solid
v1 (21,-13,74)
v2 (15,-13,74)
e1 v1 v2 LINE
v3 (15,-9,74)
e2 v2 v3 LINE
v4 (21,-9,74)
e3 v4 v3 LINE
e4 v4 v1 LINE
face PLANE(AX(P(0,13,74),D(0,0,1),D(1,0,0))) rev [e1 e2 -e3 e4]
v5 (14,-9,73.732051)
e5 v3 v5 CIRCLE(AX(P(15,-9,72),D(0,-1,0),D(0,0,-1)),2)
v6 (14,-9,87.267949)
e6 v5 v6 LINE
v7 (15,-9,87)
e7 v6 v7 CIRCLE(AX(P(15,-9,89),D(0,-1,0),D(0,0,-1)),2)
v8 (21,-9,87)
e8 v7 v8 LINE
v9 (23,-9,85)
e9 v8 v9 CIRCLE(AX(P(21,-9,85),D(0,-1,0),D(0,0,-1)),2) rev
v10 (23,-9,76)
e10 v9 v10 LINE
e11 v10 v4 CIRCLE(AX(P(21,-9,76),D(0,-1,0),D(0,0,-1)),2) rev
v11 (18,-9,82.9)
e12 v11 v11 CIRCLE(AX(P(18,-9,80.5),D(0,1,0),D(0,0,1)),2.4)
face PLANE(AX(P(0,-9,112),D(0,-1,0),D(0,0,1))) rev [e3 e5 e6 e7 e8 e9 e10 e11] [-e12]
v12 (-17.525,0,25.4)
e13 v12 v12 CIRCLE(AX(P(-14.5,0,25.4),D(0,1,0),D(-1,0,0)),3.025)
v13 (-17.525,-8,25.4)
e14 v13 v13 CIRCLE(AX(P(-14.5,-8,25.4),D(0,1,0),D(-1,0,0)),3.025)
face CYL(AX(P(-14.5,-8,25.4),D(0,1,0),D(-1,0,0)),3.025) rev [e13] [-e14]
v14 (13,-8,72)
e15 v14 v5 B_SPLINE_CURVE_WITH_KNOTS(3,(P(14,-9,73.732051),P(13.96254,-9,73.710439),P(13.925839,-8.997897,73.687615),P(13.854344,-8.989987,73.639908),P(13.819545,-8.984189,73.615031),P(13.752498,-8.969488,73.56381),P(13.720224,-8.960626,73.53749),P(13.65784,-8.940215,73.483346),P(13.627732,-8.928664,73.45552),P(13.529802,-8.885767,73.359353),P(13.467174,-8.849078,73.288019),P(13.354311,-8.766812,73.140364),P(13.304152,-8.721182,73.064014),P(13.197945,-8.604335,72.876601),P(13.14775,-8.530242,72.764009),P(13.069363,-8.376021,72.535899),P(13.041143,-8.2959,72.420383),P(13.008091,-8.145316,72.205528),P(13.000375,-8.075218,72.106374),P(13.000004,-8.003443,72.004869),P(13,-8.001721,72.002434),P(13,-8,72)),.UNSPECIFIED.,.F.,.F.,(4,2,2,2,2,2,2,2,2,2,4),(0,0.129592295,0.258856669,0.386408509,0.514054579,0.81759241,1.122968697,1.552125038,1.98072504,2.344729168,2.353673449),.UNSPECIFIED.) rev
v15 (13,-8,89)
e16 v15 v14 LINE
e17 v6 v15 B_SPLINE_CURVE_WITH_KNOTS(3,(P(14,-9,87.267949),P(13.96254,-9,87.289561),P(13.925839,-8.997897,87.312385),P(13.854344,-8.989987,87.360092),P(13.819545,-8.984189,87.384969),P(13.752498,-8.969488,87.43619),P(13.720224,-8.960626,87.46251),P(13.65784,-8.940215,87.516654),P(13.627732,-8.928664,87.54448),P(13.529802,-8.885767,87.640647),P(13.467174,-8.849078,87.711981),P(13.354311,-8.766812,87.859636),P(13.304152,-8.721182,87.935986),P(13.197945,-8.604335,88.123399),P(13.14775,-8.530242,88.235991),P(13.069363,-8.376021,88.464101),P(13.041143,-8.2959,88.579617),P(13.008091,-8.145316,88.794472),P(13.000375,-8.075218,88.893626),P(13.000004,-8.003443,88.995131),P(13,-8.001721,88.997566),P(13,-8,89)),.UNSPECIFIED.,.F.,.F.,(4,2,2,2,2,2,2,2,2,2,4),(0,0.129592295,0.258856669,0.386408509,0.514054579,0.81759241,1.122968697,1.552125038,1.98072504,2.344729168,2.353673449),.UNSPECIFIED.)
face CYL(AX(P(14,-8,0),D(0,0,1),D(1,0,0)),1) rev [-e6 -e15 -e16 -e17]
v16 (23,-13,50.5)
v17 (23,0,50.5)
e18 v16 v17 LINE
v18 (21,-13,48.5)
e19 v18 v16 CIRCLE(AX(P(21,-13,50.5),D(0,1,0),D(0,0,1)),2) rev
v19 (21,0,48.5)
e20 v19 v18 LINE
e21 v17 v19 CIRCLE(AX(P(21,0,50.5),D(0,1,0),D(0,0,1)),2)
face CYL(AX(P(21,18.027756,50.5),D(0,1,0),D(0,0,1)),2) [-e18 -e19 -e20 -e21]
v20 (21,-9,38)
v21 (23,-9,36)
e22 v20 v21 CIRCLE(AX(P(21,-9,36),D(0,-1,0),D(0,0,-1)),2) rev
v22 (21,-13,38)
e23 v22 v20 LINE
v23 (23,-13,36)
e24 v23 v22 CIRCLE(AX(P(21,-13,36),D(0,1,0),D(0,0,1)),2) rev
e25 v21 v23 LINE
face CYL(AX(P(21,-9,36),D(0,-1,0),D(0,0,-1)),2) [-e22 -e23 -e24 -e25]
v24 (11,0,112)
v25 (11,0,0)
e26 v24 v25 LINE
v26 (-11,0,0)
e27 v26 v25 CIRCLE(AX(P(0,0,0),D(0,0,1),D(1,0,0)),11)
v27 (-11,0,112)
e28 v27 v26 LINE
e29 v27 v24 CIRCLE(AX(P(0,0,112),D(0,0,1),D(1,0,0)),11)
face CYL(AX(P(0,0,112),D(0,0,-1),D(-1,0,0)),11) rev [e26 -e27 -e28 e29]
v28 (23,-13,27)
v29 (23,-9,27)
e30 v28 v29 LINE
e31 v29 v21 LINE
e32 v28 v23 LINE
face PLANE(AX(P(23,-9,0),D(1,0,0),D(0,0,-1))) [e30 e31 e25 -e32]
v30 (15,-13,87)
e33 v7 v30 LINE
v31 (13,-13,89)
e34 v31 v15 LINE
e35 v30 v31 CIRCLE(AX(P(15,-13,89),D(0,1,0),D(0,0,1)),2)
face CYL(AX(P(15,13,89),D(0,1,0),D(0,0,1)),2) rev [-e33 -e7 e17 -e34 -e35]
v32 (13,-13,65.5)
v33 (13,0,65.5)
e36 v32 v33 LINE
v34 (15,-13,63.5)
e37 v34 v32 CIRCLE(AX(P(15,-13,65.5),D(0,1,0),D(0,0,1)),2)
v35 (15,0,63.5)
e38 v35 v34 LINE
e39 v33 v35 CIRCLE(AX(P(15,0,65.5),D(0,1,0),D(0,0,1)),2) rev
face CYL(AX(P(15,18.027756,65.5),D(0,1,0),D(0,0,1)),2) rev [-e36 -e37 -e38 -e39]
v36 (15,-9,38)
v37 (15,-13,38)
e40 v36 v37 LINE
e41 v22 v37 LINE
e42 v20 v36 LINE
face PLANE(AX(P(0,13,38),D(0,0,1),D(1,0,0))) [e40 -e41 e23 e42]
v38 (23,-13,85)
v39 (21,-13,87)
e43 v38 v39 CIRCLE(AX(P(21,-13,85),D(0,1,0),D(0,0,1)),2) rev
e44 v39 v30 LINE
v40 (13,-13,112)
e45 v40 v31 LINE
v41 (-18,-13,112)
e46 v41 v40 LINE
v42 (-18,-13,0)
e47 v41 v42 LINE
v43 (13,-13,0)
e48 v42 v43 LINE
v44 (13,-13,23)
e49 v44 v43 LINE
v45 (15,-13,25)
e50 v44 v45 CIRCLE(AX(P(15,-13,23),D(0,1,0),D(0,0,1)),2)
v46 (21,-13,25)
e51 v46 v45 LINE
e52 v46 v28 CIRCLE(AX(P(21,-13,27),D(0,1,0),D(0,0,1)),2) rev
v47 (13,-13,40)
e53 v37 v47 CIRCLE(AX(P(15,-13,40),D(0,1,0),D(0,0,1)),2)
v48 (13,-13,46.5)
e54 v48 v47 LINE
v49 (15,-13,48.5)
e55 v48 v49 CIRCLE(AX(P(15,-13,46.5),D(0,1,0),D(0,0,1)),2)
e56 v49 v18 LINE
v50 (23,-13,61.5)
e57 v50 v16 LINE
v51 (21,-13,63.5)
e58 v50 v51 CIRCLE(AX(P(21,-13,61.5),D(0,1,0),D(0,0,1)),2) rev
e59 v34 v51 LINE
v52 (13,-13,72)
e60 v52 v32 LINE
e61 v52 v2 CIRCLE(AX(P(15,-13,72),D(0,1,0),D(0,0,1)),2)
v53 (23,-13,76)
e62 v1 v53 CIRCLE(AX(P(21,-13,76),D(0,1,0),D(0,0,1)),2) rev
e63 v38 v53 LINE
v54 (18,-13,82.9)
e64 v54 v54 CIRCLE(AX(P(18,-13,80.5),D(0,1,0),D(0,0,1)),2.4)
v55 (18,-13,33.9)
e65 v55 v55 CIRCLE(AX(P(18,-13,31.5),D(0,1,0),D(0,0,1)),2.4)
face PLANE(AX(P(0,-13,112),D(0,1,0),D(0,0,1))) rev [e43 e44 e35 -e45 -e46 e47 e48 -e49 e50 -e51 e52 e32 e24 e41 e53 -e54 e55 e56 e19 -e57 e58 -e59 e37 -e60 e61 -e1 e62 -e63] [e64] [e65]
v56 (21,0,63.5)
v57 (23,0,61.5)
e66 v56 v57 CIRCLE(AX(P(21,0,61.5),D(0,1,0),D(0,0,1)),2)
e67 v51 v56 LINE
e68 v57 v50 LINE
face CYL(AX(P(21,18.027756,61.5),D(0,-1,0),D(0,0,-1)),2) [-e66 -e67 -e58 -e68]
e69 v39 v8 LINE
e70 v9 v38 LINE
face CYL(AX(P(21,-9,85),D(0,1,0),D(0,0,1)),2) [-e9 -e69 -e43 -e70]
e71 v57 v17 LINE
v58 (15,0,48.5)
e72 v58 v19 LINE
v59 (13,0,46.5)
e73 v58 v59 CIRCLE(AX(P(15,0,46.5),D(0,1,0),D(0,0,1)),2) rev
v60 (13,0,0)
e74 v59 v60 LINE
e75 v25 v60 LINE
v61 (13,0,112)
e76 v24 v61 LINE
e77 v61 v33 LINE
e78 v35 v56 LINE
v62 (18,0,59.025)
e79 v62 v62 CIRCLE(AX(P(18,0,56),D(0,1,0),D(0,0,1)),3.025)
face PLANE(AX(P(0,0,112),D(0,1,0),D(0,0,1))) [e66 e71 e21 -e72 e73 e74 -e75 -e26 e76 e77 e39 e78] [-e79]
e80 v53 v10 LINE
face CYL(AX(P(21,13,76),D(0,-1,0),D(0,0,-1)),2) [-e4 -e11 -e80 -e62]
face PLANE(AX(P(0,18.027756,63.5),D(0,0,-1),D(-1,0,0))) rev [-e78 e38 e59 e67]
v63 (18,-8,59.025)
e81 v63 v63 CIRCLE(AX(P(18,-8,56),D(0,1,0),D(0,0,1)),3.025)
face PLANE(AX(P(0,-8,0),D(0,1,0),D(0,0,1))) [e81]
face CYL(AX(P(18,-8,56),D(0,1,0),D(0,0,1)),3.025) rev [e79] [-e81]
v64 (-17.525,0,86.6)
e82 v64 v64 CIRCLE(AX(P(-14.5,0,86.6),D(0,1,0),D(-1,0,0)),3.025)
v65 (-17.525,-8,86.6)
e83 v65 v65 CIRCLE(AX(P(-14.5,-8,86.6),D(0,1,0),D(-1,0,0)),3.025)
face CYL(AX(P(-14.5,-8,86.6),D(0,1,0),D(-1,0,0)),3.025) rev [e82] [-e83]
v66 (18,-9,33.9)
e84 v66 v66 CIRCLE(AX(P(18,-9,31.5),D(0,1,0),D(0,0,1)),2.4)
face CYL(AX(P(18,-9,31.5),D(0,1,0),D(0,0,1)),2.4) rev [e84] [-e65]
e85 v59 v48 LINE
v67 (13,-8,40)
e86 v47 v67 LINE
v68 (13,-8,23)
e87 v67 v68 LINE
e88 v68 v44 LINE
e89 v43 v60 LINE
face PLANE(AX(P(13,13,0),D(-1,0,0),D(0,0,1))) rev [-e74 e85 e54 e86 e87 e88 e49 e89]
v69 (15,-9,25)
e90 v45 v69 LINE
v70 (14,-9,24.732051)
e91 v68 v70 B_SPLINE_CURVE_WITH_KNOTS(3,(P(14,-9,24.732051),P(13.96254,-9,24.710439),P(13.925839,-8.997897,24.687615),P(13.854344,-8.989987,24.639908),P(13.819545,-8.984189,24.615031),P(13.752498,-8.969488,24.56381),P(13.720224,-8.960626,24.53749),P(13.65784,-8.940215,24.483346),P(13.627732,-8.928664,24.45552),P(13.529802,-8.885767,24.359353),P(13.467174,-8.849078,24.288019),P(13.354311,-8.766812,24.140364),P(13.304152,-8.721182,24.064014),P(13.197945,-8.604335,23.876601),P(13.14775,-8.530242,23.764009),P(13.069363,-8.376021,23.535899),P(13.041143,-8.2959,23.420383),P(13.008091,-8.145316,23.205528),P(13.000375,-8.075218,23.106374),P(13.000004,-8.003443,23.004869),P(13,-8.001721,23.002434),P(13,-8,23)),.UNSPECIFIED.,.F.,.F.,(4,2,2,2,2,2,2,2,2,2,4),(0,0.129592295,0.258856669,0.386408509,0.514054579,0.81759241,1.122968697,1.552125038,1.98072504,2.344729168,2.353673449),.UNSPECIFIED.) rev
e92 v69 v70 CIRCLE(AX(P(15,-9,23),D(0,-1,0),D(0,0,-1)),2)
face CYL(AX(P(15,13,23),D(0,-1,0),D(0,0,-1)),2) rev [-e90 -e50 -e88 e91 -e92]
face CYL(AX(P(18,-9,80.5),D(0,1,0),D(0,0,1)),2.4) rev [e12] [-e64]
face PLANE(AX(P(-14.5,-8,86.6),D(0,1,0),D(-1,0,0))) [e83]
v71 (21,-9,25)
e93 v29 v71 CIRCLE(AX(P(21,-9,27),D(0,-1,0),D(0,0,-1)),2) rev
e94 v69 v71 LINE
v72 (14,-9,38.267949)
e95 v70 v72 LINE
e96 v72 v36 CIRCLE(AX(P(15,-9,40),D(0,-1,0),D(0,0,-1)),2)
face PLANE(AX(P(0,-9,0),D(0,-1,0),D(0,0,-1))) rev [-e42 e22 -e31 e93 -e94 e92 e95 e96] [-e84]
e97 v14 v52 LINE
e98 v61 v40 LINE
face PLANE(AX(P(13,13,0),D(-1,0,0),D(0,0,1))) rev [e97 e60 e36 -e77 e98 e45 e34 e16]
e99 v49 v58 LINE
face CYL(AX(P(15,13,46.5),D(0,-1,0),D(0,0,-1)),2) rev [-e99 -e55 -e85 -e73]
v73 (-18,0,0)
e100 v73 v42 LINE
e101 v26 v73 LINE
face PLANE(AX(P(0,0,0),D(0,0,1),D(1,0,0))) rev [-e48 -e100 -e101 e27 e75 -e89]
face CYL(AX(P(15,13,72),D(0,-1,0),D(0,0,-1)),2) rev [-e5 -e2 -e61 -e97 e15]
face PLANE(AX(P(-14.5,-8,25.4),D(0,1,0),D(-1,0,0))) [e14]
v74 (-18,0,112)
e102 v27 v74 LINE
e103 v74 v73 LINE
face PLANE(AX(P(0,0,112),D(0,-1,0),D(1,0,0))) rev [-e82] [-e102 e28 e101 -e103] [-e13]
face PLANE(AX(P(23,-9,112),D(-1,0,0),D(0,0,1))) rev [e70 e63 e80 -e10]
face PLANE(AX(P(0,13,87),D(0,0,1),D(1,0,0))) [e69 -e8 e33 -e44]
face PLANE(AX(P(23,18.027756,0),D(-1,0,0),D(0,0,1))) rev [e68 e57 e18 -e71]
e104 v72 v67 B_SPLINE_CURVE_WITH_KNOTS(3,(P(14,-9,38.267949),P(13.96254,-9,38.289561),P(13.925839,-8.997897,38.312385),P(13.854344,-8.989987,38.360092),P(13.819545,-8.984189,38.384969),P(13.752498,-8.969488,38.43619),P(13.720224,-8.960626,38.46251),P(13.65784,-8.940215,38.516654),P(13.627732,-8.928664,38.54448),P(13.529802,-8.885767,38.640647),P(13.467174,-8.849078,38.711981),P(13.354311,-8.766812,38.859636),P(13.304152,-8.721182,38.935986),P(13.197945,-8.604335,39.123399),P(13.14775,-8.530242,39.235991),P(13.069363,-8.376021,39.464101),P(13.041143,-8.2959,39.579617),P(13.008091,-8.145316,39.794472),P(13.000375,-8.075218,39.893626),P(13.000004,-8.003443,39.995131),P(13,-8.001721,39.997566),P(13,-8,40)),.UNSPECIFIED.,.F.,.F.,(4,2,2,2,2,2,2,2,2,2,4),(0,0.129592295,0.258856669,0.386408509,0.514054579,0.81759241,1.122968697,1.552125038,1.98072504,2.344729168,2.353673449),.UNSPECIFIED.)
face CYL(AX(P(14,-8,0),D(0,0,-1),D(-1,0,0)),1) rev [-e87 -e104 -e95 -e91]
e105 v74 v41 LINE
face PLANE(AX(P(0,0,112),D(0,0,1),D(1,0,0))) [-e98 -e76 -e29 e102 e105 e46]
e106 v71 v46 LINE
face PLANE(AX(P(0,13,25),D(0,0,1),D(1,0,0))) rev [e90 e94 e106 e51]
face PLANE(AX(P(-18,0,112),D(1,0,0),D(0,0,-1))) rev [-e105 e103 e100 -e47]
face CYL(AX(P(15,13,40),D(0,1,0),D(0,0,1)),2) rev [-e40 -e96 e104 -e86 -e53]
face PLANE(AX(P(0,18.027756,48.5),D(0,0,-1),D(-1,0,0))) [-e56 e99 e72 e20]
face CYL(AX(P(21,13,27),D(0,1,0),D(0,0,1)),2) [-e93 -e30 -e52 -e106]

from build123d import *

# Parameters (mm, degrees)
BOSS_EXTRUDE1_DEPTH  = 112
SKETCH2_R            = 3.025
CUT_EXTRUDE1_DEPTH   = 8
SKETCH3_W            = 11
SKETCH3_H            = 11
BOSS_EXTRUDE2_DEPTH  = 4
BOSS_EXTRUDE3_REACH  = 126.988
SKETCH8_W            = 10
SKETCH8_H            = 13
BOSS_EXTRUDE4_DEPTH  = 4
FILLET1_R            = 2
M4_CLEARANCE_HOLE1_D = 4.8
MIRROR1_START        = 12.831076745
MIRROR1_OUTLINE_W    = 4
MIRROR1_OUTLINE_H    = 13
MIRROR1_DEPTH        = 2.768923155
MIRROR1_START_2      = 20.4000001
MIRROR1_2_OUTLINE_W  = 4
MIRROR1_2_OUTLINE_H  = 13
MIRROR1_2_DEPTH      = 0.5999999
MIRROR1_START_3      = 74
MIRROR1_3_DEPTH      = 13
MIRROR1_4_OUTLINE_W  = 4.8000002
MIRROR1_4_OUTLINE_H  = 4
MIRROR1_4_DEPTH      = 4.0999999
MIRROR1_START_4      = 82.9000001
MIRROR1_5_OUTLINE_W  = 4.8000002
MIRROR1_5_OUTLINE_H  = 4
MIRROR1_5_DEPTH      = 4.0999999
MIRROR1_START_5      = 76
MIRROR1_6_OUTLINE_W  = 2
MIRROR1_6_OUTLINE_H  = 4
MIRROR1_6_DEPTH      = 9
MIRROR1_START_6      = -13
MIRROR1_7_DEPTH      = 4
CUT_EXTRUDE2_DEPTH   = 126.455171276
BOSS_EXTRUDE5_START  = -87
BOSS_EXTRUDE5_DEPTH  = 112
SKETCH15_W           = 10
SKETCH15_H           = 15
SKETCH15_R           = 3.025
BOSS_EXTRUDE6_DEPTH  = 13
SKETCH16_R           = 3.025
CUT_EXTRUDE3_DEPTH   = 8
FILLET2_R            = 2
FILLET3_R            = 1


with BuildPart() as part:
    # Sketch1 → Boss-Extrude1 (new body)
    with BuildSketch(Plane.XY):
        with BuildLine():
            ThreePointArc((0, -13), (-9.192388155, -9.192388155), (-13, 0))
            Line((-13, 0), (-18, 0))
            Line((-18, 0), (-18, -13))
            Line((-18, -13), (0, -13))
        make_face()
        with BuildLine():
            Line((-11, 0), (-13, 0))
            ThreePointArc((-13, 0), (-9.192388155, -9.192388155), (0, -13))
            ThreePointArc((0, -13), (9.192388155, -9.192388155), (13, 0))
            Line((13, 0), (11, 0))
            ThreePointArc((11, 0), (0, -11), (-11, 0))
        make_face()
    extrude(amount=BOSS_EXTRUDE1_DEPTH)

    # Sketch2 → Cut-Extrude1 (cut)
    with BuildSketch(Plane(origin=(0, 0, 0), x_dir=(1, 0, 0), z_dir=(0, 1, 0))):
        with Locations(Location((-14.5, -25.4, 0), (0, 0, 180))):
            Circle(SKETCH2_R)
        with Locations(Location((-14.5, -86.6, 0), (0, 0, 180))):
            Circle(SKETCH2_R)
    extrude(amount=-CUT_EXTRUDE1_DEPTH, mode=Mode.SUBTRACT)

    # Sketch3 → Boss-Extrude2 (add)
    with BuildSketch(Plane.XZ.offset(13)):
        with Locations((-12.5, 117.5)):
            Rectangle(SKETCH3_W, SKETCH3_H)
    extrude(amount=-BOSS_EXTRUDE2_DEPTH)

    # Sketch7 → Boss-Extrude3 (add, up to next)
    with BuildSketch(Plane.XZ.offset(13), mode=Mode.PRIVATE) as boss_extrude3_sk1:
        Polygon((0, 25), (13, 25), (13, 31.5), (13, 38), (0, 38), align=None)
    boss_extrude3_tool1 = extrude(boss_extrude3_sk1.sketch, amount=-BOSS_EXTRUDE3_REACH, mode=Mode.PRIVATE) - part.part
    add(boss_extrude3_tool1.solids().sort_by_distance((6.5, -13, 31.5))[0])

    # Sketch8 → Boss-Extrude4 (add)
    with BuildSketch(Plane.XZ.offset(13)):
        with Locations((18, 31.5)):
            Rectangle(SKETCH8_W, SKETCH8_H)
    extrude(amount=-BOSS_EXTRUDE4_DEPTH)

    # Fillet1
    fillet1_edges = [part.edges().sort_by_distance(p)[0] for p in [
        (-18, -11, 123),
        (-7, -11, 123),
        (23, -11, 38),
        (23, -11, 25),
    ]]
    fillet(fillet1_edges, radius=FILLET1_R)

    # M4 Clearance Hole1 (through all)
    with Locations(Plane(origin=(0, -9, 0), x_dir=(1, 0, 0), z_dir=(0, 1, 0))):
        with Locations((-12.5, -117.5), (18, -31.5)):
            Hole(M4_CLEARANCE_HOLE1_D / 2)



with BuildPart() as body_2:
    # Mirror1: read off the stored shape, not the designer's step
    # Mirror1 outline → Mirror1 (new body)
    with BuildSketch(Plane.YZ.offset(MIRROR1_START)):
        with Locations((-11, 80.5)):
            Rectangle(MIRROR1_OUTLINE_W, MIRROR1_OUTLINE_H)
    extrude(amount=MIRROR1_DEPTH)


with BuildPart() as body_3:
    # Mirror1 2 outline → Mirror1 2 (new body)
    with BuildSketch(Plane.YZ.offset(MIRROR1_START_2)):
        with Locations((-11, 80.5)):
            Rectangle(MIRROR1_2_OUTLINE_W, MIRROR1_2_OUTLINE_H)
    extrude(amount=MIRROR1_2_DEPTH)


with BuildPart() as part_1:
    add(part.part)

    add(body_2.part)  # Mirror1 3 merges body 2
    # Mirror1 3 outline → Mirror1 3 (add)
    with BuildSketch(Plane.XY.offset(MIRROR1_START_3)):
        with BuildLine():
            Line((15.5999999, -9), (13, -9))
            Line((13, -9), (13, 0))
            ThreePointArc((13, 0), (9.192388155, -9.192388155), (0, -13))
            Line((0, -13), (12.831076745, -13))
            Line((12.831076745, -13), (15.5999999, -13))
            Line((15.5999999, -13), (15.5999999, -9))
        make_face()
    extrude(amount=MIRROR1_3_DEPTH)


    add(body_3.part)  # Mirror1 4 merges body 3
    # Mirror1 4 outline → Mirror1 4 (add)
    with BuildSketch(Plane.XY.offset(MIRROR1_START_3)):
        with Locations((18, -11)):
            Rectangle(MIRROR1_4_OUTLINE_W, MIRROR1_4_OUTLINE_H)
    extrude(amount=MIRROR1_4_DEPTH)

    # Mirror1 5 outline → Mirror1 5 (add)
    with BuildSketch(Plane.XY.offset(MIRROR1_START_4)):
        with Locations((18, -11)):
            Rectangle(MIRROR1_5_OUTLINE_W, MIRROR1_5_OUTLINE_H)
    extrude(amount=MIRROR1_5_DEPTH)

    # Mirror1 6 outline → Mirror1 6 (add)
    with BuildSketch(Plane.XY.offset(MIRROR1_START_5)):
        with Locations((22, -11)):
            Rectangle(MIRROR1_6_OUTLINE_W, MIRROR1_6_OUTLINE_H)
    extrude(amount=MIRROR1_6_DEPTH)

    # Mirror1 7 outline → Mirror1 7 (add)
    with BuildSketch(Plane(origin=(0, 0, 0), x_dir=(1, 0, 0), z_dir=(0, 1, 0)).offset(MIRROR1_START_6)):
        with BuildLine():
            ThreePointArc((23, -76), (22.414213562, -74.585786438), (21, -74))
            Line((21, -74), (21, -76))
            Line((21, -76), (23, -76))
        make_face()
        with BuildLine():
            Line((21, -85), (21, -87))
            ThreePointArc((21, -87), (22.414213562, -86.414213562), (23, -85))
            Line((23, -85), (21, -85))
        make_face()
        with BuildLine():
            Line((20.4000001, -82.9000001), (20.4, -80.5))
            ThreePointArc((20.4, -80.5), (19.697056275, -82.197056275), (18, -82.9))
            Line((18, -82.9), (20.4000001, -82.9000001))
        make_face()
        with BuildLine():
            ThreePointArc((18, -78.1), (19.697056275, -78.802943725), (20.4, -80.5))
            Line((20.4, -80.5), (20.4000001, -78.0999999))
            Line((20.4000001, -78.0999999), (18, -78.1))
        make_face()
        with BuildLine():
            ThreePointArc((15.6, -80.5), (16.302943725, -78.802943725), (18, -78.1))
            Line((18, -78.1), (15.5999999, -78.0999999))
            Line((15.5999999, -78.0999999), (15.6, -80.5))
        make_face()
        with BuildLine():
            Line((15.5999999, -82.9000001), (18, -82.9))
            ThreePointArc((18, -82.9), (16.302943725, -82.197056275), (15.6, -80.5))
            Line((15.6, -80.5), (15.5999999, -82.9000001))
        make_face()
    extrude(amount=MIRROR1_7_DEPTH)

    # Sketch12 → Cut-Extrude2 (cut, through all)
    with BuildSketch(Plane(origin=(0, -9, 0), x_dir=(1, 0, 0), z_dir=(0, 1, 0))):
        with BuildLine():
            Line((-18, -112), (-18, -121))
            ThreePointArc((-18, -121), (-17.414213562, -122.414213562), (-16, -123))
            Line((-16, -123), (-9, -123))
            ThreePointArc((-9, -123), (-7.585786438, -122.414213562), (-7, -121))
            Line((-7, -121), (-7, -112))
            Line((-7, -112), (-18, -112))
        make_face()
    extrude(amount=-CUT_EXTRUDE2_DEPTH, mode=Mode.SUBTRACT)

    # Sketch13 → Boss-Extrude5 (add)
    with BuildSketch(Plane.XY.offset(87).offset(BOSS_EXTRUDE5_START)):
        with BuildLine():
            Line((13, -13), (13, -9))
            Line((13, -9), (13, 0))
            ThreePointArc((13, 0), (9.192388155, -9.192388155), (0, -13))
            Line((0, -13), (13, -13))
        make_face()
    extrude(amount=BOSS_EXTRUDE5_DEPTH)

    # Sketch15 → Boss-Extrude6 (add)
    # profile 1 of 2: a face of its own
    with BuildSketch(Plane.XZ.offset(13)):
        with Locations((18, 56)):
            Rectangle(SKETCH15_W, SKETCH15_H)
        with Locations((18, 56)):
            Circle(SKETCH15_R, mode=Mode.SUBTRACT)
    # profile 2 of 2: a face of its own
    with BuildSketch(Plane.XZ.offset(13)):
        with Locations((18, 56)):
            Circle(SKETCH15_R)
    extrude(amount=-BOSS_EXTRUDE6_DEPTH)

    # Sketch16 → Cut-Extrude3 (cut)
    with BuildSketch(Plane(origin=(0, 0, 0), x_dir=(1, 0, 0), z_dir=(0, 1, 0))):
        with Locations(Location((18, -56, 0), (0, 0, 270))):
            Circle(SKETCH16_R)
    extrude(amount=-CUT_EXTRUDE3_DEPTH, mode=Mode.SUBTRACT)

    # Fillet2
    fillet2_edges = [part_1.edges().sort_by_distance(p)[0] for p in [
        (13, -11, 25),
        (13, -11, 38),
        (13, -11, 74),
        (13, -11, 87),
        (23, -6.5, 63.5),
        (23, -6.5, 48.5),
        (13, -6.5, 48.5),
        (13, -6.5, 63.5),
    ]]
    fillet(fillet2_edges, radius=FILLET2_R)

    # Fillet3
    fillet3_edges = [part_1.edges().sort_by_distance(p)[0] for p in [
        (13, -9, 80.5),
        (13, -9, 31.5),
    ]]
    fillet(fillet3_edges, radius=FILLET3_R)


solid = part_1.part
